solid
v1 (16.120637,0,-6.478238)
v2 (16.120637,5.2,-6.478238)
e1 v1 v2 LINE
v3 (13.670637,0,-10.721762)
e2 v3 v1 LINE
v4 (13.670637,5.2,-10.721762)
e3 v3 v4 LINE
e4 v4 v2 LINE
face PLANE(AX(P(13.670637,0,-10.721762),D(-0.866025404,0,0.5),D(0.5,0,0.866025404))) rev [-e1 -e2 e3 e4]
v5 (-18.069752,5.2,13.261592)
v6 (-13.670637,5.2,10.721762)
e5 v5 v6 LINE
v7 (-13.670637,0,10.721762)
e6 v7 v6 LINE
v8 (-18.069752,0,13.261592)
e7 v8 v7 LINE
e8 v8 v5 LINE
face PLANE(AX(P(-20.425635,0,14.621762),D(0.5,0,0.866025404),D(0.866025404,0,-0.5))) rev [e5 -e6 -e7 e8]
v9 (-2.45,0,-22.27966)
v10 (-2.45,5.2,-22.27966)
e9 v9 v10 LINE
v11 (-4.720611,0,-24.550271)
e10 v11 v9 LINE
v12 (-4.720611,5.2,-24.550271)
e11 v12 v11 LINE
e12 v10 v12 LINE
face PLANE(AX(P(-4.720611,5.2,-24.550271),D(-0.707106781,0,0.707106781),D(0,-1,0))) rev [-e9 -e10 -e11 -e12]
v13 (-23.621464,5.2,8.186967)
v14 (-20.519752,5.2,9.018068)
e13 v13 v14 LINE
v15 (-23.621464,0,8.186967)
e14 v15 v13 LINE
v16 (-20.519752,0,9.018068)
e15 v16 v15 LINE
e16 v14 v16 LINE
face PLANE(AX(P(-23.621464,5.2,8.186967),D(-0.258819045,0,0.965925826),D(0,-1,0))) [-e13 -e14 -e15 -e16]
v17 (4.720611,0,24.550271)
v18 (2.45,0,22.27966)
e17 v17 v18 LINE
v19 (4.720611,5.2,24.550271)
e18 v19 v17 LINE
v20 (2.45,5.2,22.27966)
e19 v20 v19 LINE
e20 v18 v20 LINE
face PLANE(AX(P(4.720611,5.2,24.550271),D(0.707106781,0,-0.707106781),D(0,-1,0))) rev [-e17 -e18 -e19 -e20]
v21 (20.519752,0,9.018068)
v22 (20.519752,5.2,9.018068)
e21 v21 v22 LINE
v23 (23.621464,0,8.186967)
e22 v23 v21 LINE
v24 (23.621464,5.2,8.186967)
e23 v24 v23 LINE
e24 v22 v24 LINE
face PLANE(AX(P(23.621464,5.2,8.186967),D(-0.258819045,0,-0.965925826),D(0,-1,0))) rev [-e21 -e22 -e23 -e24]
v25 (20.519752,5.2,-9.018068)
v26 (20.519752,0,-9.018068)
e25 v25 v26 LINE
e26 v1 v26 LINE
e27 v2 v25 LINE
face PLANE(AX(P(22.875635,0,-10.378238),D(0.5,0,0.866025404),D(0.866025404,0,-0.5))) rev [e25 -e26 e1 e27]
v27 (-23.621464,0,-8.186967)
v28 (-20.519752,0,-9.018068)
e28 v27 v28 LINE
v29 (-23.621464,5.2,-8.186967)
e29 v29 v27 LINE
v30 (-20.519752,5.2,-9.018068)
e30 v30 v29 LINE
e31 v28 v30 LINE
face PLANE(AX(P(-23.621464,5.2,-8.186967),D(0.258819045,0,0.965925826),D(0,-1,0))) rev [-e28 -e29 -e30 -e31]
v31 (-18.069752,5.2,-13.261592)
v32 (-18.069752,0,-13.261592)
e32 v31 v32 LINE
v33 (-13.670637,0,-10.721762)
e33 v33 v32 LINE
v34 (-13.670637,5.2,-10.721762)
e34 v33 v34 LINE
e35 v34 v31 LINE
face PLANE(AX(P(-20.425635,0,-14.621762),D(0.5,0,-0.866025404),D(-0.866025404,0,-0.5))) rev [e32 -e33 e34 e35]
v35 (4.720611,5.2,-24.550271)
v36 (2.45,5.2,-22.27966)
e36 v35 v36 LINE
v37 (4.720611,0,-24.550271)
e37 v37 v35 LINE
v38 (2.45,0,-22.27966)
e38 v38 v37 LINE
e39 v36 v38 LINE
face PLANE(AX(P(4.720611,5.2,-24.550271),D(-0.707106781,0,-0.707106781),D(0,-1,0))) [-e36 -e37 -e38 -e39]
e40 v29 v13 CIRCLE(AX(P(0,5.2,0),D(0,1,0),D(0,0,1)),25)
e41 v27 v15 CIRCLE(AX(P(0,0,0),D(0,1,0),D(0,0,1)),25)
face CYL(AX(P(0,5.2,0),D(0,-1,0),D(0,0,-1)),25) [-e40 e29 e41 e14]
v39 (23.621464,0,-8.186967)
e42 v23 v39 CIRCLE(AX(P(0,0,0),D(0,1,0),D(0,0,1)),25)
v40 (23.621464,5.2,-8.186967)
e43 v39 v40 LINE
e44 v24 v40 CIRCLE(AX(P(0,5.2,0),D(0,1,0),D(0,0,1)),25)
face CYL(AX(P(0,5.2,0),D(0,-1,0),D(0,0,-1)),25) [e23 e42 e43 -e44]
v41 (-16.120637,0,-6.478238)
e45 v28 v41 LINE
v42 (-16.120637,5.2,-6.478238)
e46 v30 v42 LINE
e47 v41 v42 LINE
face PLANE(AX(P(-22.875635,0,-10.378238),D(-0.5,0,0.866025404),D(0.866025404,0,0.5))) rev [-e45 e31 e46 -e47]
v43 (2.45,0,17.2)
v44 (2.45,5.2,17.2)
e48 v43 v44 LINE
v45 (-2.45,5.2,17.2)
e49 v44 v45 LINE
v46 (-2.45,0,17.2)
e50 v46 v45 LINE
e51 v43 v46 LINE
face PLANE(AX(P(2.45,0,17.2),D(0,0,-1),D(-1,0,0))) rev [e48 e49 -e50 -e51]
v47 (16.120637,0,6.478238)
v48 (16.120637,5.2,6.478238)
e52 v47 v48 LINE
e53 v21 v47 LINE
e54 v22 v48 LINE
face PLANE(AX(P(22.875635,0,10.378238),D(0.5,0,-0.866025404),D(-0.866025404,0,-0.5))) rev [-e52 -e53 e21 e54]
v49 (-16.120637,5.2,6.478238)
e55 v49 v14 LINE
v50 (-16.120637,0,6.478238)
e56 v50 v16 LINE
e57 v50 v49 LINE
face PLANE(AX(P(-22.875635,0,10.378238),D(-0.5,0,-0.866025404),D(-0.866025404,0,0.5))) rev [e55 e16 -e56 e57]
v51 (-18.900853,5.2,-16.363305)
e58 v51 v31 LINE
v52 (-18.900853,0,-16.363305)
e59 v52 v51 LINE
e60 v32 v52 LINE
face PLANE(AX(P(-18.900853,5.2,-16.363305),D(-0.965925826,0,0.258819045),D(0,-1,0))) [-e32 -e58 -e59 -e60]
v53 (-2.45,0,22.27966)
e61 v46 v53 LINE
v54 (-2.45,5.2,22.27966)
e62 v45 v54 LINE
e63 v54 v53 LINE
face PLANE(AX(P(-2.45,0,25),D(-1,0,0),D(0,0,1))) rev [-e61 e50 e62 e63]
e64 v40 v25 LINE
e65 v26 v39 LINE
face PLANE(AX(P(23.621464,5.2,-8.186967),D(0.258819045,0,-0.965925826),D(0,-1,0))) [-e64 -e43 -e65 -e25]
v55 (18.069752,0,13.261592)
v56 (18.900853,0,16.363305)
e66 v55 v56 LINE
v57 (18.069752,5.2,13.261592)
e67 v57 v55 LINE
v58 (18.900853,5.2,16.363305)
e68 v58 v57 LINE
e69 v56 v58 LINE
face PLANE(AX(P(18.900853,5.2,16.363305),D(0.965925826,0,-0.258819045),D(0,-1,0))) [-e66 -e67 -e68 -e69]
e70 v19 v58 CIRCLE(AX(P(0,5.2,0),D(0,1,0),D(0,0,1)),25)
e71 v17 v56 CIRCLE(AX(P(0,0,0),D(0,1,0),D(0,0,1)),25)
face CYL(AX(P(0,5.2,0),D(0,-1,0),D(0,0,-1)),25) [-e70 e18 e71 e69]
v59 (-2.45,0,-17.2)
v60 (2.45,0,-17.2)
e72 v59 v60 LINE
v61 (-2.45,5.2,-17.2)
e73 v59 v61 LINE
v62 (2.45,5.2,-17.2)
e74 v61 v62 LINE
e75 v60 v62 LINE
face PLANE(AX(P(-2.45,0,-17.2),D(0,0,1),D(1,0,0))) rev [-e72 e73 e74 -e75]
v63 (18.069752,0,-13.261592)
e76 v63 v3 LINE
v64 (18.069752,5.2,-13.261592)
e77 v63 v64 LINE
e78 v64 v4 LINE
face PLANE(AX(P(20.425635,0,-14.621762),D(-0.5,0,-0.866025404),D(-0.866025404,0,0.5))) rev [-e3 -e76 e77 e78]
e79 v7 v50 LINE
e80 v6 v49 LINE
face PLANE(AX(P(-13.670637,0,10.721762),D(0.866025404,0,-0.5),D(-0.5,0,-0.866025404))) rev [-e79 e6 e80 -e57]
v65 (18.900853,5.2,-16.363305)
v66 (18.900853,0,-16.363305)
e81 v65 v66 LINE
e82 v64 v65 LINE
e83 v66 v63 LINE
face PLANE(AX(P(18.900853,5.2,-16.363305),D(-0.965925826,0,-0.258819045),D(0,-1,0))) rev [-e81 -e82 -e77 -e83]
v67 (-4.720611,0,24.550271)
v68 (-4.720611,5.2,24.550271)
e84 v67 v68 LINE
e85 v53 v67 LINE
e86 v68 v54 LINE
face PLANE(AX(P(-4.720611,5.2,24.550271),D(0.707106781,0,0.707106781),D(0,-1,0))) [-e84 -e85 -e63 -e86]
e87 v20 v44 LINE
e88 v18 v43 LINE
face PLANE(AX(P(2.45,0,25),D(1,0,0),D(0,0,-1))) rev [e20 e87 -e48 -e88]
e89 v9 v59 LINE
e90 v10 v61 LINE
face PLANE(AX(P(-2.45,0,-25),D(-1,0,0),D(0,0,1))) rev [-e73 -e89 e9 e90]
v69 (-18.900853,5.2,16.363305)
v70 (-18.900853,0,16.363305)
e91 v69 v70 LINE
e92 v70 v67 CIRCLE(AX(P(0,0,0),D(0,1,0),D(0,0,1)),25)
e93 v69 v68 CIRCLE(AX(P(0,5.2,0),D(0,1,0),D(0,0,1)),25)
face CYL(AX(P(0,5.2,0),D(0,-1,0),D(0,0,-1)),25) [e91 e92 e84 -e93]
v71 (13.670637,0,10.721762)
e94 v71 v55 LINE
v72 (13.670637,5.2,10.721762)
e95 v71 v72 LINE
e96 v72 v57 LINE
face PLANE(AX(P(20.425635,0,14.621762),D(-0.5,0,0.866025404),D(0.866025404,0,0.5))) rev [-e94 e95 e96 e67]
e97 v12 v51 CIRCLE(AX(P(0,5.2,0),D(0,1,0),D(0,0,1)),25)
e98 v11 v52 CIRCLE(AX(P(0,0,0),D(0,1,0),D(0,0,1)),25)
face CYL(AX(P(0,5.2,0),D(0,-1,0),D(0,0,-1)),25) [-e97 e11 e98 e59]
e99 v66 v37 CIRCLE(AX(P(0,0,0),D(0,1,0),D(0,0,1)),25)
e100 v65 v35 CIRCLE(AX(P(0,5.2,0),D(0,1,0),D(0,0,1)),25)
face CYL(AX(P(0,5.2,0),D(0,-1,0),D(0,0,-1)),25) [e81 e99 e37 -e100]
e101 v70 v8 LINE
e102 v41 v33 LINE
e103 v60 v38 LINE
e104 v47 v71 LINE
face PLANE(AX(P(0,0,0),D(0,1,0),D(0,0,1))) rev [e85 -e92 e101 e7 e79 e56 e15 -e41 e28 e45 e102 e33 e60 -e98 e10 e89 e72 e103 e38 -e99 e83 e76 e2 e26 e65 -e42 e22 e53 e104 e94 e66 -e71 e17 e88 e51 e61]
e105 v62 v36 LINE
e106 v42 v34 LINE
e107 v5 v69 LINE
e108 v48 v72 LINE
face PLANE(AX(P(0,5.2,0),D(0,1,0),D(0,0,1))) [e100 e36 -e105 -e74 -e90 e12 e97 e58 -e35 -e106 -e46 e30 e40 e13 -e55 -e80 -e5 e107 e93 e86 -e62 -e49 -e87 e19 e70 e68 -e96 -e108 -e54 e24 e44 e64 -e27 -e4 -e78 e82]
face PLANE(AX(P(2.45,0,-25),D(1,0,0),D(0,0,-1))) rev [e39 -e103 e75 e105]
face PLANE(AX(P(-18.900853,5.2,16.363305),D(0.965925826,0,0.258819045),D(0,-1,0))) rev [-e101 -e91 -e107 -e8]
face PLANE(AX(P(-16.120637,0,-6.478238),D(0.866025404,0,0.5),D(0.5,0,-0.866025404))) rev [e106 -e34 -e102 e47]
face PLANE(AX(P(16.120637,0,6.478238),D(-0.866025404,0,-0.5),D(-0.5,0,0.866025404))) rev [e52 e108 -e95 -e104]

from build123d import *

# Parameters (mm, degrees)
SKETCH1_R           = 25
BOSS_EXTRUDE1_DEPTH = 5.2
SKETCH2_W           = 4.9
SKETCH2_H           = 7.8
CUT_EXTRUDE1_DEPTH  = 5.2
CHAMFER1_SIZE       = 2.6


with BuildPart() as part:
    # Sketch1 → Boss-Extrude1 (new body)
    with BuildSketch(Plane(origin=(0, 0, 0), x_dir=(1, 0, 0), z_dir=(0, 1, 0))):
        with Locations(Location((0, 0, 0), (0, 0, 270))):
            Circle(SKETCH1_R)
    extrude(amount=BOSS_EXTRUDE1_DEPTH)

    # Sketch2 → Cut-Extrude1 (cut)
    with BuildSketch(Plane(origin=(0, 5.2, 0), x_dir=(1, 0, 0), z_dir=(0, 1, 0))):
        Polygon((22.875635095, 10.378237761), (16.120636945, 6.478237761), (13.670636945, 10.721762239), (20.425635095, 14.621762239), align=None)
        with Locations((0, 21.1)):
            Rectangle(SKETCH2_W, SKETCH2_H)
        Polygon((20.425635095, -14.621762239), (13.670636945, -10.721762239), (16.120636945, -6.478237761), (22.875635095, -10.378237761), align=None)
        with Locations((0, -21.1)):
            Rectangle(SKETCH2_W, SKETCH2_H)
        Polygon((-22.875635095, -10.378237761), (-16.120636945, -6.478237761), (-13.670636945, -10.721762239), (-20.425635095, -14.621762239), align=None)
        Polygon((-20.425635095, 14.621762239), (-13.670636945, 10.721762239), (-16.120636945, 6.478237761), (-22.875635095, 10.378237761), align=None)
    extrude(amount=-CUT_EXTRUDE1_DEPTH, mode=Mode.SUBTRACT)

    # Chamfer1
    # the kernel refuses this chamfer: 2.6, 2.378368378 mm, written as the material it takes off along each edge
    with BuildSketch(Plane(origin=(20.321417916, 11.886375769, -14.561592423), x_dir=(-0.6191501526996462, 0, -0.7852726204395546), z_dir=(0, -1, 0)), Plane(origin=(-2.45, 11.886375769, -24.879660367), x_dir=(-0.9896411145468598, 0, 0.14356345077508154), z_dir=(0, -1, 0)), Plane(origin=(-22.771417916, 11.886375769, -10.318067944), x_dir=(-0.37049096184717384, 0, 0.9288360712146981), z_dir=(0, -1, 0)), Plane(origin=(-20.321417916, 11.886375769, 14.561592423), x_dir=(0.6191501526997778, 0, 0.785272620439451), z_dir=(0, -1, 0)), Plane(origin=(2.45, 11.886375769, 24.879660367), x_dir=(0.9896411145468216, 0, -0.14356345077534402), z_dir=(0, -1, 0)), Plane(origin=(22.771417916, 11.886375769, 10.318067944), x_dir=(0.3704909618470835, 0, -0.9288360712147342), z_dir=(0, -1, 0))) as chamfer1_piece_1:
        with BuildLine():
            Line((2.294378332, 0), (CHAMFER1_SIZE * 0.143563450775, -CHAMFER1_SIZE * 0.989641114547))
            Line((CHAMFER1_SIZE * 0.143563450775, -CHAMFER1_SIZE * 0.989641114547), (0, 0))
            ThreePointArc((0, 0), (1.178279971, 0.026315397), (2.294378332, 0))
        make_face()
    extrude(amount=18.572751537, mode=Mode.SUBTRACT)
    with BuildSketch(Plane(origin=(22.771417916, 11.886375769, -10.318067944), x_dir=(-0.8660254037844386, 0, 0.49999999999999983), z_dir=(0, -1, 0)), Plane(origin=(2.45, 11.886375769, -24.879660367), x_dir=(0, 0, 1), z_dir=(0, -1, 0)), Plane(origin=(-20.321417916, 11.886375769, -14.561592423), x_dir=(0.8660254037844397, 0, 0.4999999999999983), z_dir=(0, -1, 0)), Plane(origin=(-22.771417916, 11.886375769, 10.318067944), x_dir=(0.8660254037844377, 0, -0.5000000000000014), z_dir=(0, -1, 0)), Plane(origin=(-2.45, 11.886375769, 24.879660367), x_dir=(0, 0, -1), z_dir=(0, -1, 0))) as chamfer1_piece_2:
        with BuildLine():
            Line((CHAMFER1_SIZE, 0), (0.329388871, -2.270611129))
            ThreePointArc((0.329388871, -2.270611129), (0.14311514, -1.169852233), (0, 0))
            Line((0, 0), (CHAMFER1_SIZE, 0))
        make_face()
    extrude(amount=18.572751537, mode=Mode.SUBTRACT)
    with BuildSketch(Plane(origin=(20.321417916, 11.886375769, 14.561592423), x_dir=(-0.6191501526994649, 0, 0.7852726204396976), z_dir=(0, -1, 0))) as chamfer1_piece_3:
        with BuildLine():
            Line((2.294378332, 0), (CHAMFER1_SIZE * 0.143563450775, CHAMFER1_SIZE * 0.989641114547))
            Line((CHAMFER1_SIZE * 0.143563450775, CHAMFER1_SIZE * 0.989641114547), (0, 0))
            ThreePointArc((0, 0), (1.178279971, -0.026315397), (2.294378332, 0))
        make_face()
    extrude(amount=18.572751537, mode=Mode.SUBTRACT)


solid = part.part
